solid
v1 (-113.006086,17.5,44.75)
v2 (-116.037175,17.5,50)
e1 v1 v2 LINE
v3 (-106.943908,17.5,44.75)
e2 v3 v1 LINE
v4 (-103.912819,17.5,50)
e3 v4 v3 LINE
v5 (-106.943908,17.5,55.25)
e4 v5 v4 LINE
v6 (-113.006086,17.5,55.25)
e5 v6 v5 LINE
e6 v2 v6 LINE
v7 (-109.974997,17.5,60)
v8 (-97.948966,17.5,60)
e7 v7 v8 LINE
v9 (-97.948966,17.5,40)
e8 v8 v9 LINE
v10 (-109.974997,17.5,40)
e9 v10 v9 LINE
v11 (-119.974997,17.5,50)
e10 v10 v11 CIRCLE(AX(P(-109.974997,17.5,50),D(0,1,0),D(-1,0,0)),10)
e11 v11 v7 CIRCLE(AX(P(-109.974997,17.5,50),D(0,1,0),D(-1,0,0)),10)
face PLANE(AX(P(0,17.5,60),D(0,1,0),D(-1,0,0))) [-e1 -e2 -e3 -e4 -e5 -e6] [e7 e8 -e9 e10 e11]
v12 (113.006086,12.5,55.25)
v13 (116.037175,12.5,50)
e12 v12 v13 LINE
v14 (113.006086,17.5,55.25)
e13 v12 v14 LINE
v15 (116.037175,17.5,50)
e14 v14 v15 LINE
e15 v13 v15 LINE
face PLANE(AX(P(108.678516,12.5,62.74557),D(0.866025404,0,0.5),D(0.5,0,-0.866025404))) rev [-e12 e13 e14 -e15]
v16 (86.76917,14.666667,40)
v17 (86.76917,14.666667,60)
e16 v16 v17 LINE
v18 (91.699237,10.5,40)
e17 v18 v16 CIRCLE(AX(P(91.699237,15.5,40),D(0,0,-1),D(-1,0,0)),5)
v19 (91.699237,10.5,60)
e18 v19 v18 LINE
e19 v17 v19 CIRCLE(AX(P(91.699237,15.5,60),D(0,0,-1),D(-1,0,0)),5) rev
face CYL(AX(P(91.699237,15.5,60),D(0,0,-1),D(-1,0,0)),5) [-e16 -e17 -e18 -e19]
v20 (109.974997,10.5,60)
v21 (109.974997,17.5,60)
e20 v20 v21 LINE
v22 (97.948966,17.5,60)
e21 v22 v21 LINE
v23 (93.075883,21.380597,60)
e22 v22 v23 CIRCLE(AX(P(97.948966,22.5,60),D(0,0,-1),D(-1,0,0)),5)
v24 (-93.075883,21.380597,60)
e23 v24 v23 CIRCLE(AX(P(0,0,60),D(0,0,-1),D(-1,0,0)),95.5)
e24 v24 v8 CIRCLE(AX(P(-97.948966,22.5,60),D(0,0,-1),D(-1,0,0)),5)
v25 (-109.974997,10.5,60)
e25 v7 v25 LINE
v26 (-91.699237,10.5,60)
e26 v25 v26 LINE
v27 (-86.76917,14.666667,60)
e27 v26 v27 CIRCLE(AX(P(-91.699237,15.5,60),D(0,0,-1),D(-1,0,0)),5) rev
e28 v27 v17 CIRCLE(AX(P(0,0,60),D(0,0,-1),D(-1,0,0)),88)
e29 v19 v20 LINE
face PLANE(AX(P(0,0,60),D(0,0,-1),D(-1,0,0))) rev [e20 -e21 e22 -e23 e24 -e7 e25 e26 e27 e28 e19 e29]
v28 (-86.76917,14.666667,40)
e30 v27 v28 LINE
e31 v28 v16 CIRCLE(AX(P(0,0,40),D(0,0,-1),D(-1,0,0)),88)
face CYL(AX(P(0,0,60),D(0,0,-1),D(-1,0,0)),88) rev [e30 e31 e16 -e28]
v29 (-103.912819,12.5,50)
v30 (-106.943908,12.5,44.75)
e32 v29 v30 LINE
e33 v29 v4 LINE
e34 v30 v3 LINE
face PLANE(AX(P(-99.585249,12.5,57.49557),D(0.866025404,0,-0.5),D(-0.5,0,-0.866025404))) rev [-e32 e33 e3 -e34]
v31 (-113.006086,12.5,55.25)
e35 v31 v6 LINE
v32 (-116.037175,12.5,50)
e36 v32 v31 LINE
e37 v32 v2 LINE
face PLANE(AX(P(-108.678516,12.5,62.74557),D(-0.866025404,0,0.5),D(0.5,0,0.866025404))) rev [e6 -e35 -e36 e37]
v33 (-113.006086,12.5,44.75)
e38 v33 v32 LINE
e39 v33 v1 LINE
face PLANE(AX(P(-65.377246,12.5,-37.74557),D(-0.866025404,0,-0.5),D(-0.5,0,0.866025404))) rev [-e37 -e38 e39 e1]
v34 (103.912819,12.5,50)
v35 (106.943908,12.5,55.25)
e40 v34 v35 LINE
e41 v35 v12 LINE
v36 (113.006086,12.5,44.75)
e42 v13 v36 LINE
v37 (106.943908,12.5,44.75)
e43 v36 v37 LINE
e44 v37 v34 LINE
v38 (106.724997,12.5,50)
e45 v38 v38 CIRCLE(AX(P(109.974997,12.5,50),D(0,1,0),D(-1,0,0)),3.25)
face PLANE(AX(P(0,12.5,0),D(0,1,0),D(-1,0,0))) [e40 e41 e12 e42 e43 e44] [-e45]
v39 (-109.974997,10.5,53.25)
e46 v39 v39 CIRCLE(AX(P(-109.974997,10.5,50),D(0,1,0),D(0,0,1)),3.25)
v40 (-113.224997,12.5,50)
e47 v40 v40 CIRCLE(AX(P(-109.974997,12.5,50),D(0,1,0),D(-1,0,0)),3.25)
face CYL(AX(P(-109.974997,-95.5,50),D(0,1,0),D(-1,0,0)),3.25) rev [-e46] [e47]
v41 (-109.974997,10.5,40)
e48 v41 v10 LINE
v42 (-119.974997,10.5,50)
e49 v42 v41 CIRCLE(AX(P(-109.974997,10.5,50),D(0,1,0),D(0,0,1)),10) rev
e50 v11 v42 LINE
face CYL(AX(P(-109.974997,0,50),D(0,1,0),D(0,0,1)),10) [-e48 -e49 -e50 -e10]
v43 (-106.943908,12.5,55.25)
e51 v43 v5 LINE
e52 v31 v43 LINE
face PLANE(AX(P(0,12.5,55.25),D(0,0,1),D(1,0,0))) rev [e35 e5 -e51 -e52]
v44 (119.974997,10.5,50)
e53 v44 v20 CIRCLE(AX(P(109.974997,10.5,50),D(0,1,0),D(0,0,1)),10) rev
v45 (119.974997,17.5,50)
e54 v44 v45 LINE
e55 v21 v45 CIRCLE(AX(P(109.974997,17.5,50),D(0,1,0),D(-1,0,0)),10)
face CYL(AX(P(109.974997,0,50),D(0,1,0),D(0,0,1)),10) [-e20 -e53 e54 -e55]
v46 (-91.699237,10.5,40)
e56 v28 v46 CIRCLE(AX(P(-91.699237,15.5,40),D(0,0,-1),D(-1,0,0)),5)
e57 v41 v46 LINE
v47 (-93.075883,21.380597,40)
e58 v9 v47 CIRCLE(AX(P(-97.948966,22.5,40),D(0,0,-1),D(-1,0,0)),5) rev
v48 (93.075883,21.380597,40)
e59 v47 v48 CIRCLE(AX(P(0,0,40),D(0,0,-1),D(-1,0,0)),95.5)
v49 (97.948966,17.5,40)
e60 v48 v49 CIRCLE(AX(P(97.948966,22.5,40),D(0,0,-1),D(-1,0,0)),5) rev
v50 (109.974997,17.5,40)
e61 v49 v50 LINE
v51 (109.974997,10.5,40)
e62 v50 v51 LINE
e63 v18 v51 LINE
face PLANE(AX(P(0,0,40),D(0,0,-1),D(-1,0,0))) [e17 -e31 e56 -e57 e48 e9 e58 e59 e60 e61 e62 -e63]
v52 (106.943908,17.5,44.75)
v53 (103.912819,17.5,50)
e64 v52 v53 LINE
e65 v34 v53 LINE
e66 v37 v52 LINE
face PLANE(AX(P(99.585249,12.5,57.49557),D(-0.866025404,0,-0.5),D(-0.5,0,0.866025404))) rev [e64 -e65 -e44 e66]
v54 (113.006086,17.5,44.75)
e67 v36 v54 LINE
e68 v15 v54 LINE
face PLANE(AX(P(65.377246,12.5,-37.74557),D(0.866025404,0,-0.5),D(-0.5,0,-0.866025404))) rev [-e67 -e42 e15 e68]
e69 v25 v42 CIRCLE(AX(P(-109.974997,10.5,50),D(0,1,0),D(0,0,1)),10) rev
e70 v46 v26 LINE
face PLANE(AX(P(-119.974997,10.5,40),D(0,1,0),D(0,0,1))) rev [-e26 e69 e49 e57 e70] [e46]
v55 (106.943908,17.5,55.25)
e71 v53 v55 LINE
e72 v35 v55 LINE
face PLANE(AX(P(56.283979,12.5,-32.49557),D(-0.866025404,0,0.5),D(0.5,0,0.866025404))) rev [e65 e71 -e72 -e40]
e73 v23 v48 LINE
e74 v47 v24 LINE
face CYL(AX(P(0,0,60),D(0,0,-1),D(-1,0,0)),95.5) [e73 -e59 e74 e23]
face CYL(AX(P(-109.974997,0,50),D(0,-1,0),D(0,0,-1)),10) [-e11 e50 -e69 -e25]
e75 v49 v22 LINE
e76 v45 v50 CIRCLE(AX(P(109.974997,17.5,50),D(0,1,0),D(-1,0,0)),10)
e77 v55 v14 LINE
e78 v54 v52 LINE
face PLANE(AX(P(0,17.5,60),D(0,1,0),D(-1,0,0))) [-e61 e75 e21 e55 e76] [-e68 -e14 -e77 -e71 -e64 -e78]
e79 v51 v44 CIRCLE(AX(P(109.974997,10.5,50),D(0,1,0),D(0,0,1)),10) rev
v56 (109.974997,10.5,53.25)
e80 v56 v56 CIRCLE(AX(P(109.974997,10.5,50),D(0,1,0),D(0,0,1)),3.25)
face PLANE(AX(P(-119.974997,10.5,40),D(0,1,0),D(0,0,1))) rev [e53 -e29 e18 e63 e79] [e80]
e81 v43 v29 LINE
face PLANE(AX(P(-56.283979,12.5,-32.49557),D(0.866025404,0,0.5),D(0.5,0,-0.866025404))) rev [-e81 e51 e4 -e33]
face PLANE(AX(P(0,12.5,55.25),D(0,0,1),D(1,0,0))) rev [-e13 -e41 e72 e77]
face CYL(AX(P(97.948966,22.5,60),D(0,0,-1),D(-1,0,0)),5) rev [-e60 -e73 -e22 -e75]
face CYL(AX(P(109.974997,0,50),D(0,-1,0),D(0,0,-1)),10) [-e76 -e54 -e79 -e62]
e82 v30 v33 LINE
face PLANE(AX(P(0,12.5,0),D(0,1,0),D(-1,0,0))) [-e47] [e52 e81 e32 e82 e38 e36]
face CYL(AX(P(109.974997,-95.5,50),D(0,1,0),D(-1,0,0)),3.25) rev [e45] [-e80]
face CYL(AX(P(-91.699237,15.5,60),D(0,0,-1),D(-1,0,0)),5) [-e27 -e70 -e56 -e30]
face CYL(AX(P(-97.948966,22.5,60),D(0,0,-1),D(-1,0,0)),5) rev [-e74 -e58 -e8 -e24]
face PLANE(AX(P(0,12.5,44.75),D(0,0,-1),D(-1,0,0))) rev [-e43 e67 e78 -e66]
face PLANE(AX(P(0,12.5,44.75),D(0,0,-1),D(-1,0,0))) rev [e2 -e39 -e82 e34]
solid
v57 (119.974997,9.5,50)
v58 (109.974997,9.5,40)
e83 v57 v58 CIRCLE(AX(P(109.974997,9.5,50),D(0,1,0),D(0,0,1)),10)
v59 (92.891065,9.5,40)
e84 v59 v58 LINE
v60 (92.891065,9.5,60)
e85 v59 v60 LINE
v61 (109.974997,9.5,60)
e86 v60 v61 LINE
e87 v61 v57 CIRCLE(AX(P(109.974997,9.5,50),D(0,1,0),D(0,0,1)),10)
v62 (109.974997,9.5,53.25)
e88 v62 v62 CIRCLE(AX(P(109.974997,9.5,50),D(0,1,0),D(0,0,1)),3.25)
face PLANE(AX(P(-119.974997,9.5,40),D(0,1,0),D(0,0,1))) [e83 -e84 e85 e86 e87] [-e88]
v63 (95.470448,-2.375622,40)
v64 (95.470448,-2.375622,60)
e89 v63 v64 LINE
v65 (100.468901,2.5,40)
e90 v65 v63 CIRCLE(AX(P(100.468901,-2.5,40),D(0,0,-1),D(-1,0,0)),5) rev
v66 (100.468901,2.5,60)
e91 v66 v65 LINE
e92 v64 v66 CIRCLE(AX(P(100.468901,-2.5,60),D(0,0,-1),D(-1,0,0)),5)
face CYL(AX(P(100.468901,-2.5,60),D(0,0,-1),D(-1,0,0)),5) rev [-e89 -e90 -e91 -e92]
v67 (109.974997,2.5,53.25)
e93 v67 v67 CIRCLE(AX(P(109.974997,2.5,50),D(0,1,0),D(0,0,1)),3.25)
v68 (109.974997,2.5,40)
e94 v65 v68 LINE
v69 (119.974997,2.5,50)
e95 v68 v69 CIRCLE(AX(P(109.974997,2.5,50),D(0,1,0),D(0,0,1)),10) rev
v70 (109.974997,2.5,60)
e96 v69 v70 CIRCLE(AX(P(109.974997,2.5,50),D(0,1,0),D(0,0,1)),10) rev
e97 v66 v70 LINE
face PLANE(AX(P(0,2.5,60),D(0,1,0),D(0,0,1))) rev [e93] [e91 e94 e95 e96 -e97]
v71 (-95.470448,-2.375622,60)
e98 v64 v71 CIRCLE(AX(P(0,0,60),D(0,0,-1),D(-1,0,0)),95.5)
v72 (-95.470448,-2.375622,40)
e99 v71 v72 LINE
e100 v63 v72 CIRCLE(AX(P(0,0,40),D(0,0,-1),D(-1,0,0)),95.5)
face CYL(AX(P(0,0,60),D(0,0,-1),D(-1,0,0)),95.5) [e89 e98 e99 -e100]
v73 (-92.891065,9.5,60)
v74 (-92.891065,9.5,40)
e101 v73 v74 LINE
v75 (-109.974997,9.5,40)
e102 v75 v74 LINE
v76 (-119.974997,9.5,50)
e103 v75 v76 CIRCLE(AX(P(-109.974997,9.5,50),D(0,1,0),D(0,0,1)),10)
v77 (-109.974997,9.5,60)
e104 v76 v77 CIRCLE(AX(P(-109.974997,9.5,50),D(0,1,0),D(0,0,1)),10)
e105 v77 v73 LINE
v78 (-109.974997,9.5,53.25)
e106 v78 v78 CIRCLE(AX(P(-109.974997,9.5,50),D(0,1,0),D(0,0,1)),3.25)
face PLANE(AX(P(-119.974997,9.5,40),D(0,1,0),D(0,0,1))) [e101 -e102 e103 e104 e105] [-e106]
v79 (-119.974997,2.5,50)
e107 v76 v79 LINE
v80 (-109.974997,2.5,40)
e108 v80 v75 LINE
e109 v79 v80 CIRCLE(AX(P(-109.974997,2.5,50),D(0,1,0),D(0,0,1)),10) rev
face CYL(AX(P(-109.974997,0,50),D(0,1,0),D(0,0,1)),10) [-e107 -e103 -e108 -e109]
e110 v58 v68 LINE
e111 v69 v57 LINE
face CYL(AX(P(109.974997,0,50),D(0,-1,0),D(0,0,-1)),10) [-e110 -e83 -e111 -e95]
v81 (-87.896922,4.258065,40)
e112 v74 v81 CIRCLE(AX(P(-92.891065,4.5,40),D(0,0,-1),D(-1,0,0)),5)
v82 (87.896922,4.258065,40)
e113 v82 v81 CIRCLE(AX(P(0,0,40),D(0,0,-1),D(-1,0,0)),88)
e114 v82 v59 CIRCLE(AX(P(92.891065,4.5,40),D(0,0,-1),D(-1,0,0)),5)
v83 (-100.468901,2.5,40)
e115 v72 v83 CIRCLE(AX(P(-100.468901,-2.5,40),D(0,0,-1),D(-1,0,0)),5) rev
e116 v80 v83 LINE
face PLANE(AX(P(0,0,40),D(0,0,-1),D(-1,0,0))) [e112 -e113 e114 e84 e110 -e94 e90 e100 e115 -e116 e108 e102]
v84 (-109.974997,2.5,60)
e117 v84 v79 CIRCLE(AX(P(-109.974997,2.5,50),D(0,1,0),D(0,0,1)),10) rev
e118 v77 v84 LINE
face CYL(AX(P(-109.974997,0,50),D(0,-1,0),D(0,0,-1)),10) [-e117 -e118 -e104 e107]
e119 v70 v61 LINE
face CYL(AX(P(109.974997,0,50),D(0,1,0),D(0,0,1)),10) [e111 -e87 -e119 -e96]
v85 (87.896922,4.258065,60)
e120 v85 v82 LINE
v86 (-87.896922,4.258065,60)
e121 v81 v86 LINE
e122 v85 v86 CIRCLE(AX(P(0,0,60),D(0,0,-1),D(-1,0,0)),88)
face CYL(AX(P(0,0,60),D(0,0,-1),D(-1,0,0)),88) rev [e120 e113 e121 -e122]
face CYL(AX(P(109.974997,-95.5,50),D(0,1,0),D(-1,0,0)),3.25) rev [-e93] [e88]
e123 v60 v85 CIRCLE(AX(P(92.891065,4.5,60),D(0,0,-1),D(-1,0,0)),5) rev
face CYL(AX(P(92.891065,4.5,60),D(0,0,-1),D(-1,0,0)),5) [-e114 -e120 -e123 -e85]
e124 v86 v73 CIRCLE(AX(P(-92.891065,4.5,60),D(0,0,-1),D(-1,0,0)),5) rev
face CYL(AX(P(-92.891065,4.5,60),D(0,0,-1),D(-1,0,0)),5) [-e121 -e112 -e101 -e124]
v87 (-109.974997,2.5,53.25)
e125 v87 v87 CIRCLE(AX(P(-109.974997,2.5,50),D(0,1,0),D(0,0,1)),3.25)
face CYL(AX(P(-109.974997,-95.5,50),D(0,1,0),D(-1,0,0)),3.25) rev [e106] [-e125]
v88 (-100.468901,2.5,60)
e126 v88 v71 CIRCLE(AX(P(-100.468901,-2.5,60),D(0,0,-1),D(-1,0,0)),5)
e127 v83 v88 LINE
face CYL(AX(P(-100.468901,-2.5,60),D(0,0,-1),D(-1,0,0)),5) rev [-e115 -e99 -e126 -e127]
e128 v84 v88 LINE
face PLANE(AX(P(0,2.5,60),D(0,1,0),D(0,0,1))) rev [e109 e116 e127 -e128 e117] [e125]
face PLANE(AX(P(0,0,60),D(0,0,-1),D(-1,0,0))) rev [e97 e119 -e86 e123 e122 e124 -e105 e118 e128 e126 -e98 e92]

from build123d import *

# Parameters (mm, degrees)
BOSS_EXTRUDE1_DEPTH     = 20
CUT_EXTRUDE1_DEPTH      = 266.13439864
CUT_EXTRUDE1_DEPTH_BACK = 266.13439864
SKETCH3_W               = 20
SKETCH3_H               = 1
FILLET1_R               = 5
FILLET2_R               = 5
FILLET3_R               = 10
FILLET4_R               = 10
CUT_EXTRUDE2_DEPTH      = 5
SKETCH5_R               = 3.25
CUT_EXTRUDE3_DEPTH      = 173.214981616


with BuildPart() as part:
    # Sketch2 → Boss-Extrude1 (new body)
    with BuildSketch(Plane(origin=(0, 0, 40), x_dir=(-1, 0, 0), z_dir=(0, 0, -1))):
        with BuildLine():
            Line((94.97499671, 10), (119.97499671, 10))
            Line((119.97499671, 10), (119.97499671, 17.5))
            Line((119.97499671, 17.5), (93.882905792, 17.5))
            ThreePointArc((93.882905792, 17.5), (94.503382661, 13.760838116), (94.97499671, 10))
        make_face()
        with BuildLine():
            Line((87.429971978, 10), (94.97499671, 10))
            ThreePointArc((94.97499671, 10), (94.503382661, 13.760838116), (93.882905792, 17.5))
            Line((93.882905792, 17.5), (86.242390969, 17.5))
            ThreePointArc((86.242390969, 17.5), (86.917115189, 13.762815379), (87.429971978, 10))
        make_face()
        with BuildLine():
            Line((86.242390969, 17.5), (93.882905792, 17.5))
            ThreePointArc((93.882905792, 17.5), (0, 95.5), (-93.882905792, 17.5))
            Line((-93.882905792, 17.5), (-86.242390969, 17.5))
            ThreePointArc((-86.242390969, 17.5), (0, 88), (86.242390969, 17.5))
        make_face()
        with BuildLine():
            Line((87.964481468, 2.5), (95.467271879, 2.5))
            ThreePointArc((95.467271879, 2.5), (95.294946961, 6.254844819), (94.97499671, 10))
            Line((94.97499671, 10), (87.429971978, 10))
            ThreePointArc((87.429971978, 10), (87.77736653, 6.255711398), (87.964481468, 2.5))
        make_face()
        with BuildLine():
            Line((95.467271879, 2.5), (119.97499671, 2.5))
            Line((119.97499671, 2.5), (119.97499671, 10))
            Line((119.97499671, 10), (94.97499671, 10))
            ThreePointArc((94.97499671, 10), (95.294946961, 6.254844819), (95.467271879, 2.5))
        make_face()
        with BuildLine():
            ThreePointArc((95.5, 0), (95.491817619, 1.250107108), (95.467271879, 2.5))
            Line((95.467271879, 2.5), (87.964481468, 2.5))
            ThreePointArc((87.964481468, 2.5), (87.991119919, 1.25012615), (88, 0))
            ThreePointArc((88, 0), (-1.25012615, -87.991119919), (-87.964481468, 2.5))
            Line((-87.964481468, 2.5), (-95.467271879, 2.5))
            ThreePointArc((-95.467271879, 2.5), (-1.250107108, -95.491817619), (95.5, 0))
        make_face()
        with BuildLine():
            Line((-95.467271879, 2.5), (-87.964481468, 2.5))
            ThreePointArc((-87.964481468, 2.5), (-87.77736653, 6.255711398), (-87.429971978, 10))
            Line((-87.429971978, 10), (-94.97499671, 10))
            ThreePointArc((-94.97499671, 10), (-95.294946961, 6.254844819), (-95.467271879, 2.5))
        make_face()
        with BuildLine():
            Line((-94.97499671, 10), (-87.429971978, 10))
            ThreePointArc((-87.429971978, 10), (-86.917115189, 13.762815379), (-86.242390969, 17.5))
            Line((-86.242390969, 17.5), (-93.882905792, 17.5))
            ThreePointArc((-93.882905792, 17.5), (-94.503382661, 13.760838116), (-94.97499671, 10))
        make_face()
        with BuildLine():
            Line((-119.97499671, 10), (-94.97499671, 10))
            ThreePointArc((-94.97499671, 10), (-94.503382661, 13.760838116), (-93.882905792, 17.5))
            Line((-93.882905792, 17.5), (-119.97499671, 17.5))
            Line((-119.97499671, 17.5), (-119.97499671, 10))
        make_face()
        with BuildLine():
            Line((-119.97499671, 2.5), (-95.467271879, 2.5))
            ThreePointArc((-95.467271879, 2.5), (-95.294946961, 6.254844819), (-94.97499671, 10))
            Line((-94.97499671, 10), (-119.97499671, 10))
            Line((-119.97499671, 10), (-119.97499671, 2.5))
        make_face()
    extrude(amount=-BOSS_EXTRUDE1_DEPTH)

    # Sketch3 → Cut-Extrude1 (cut, two sides: drawn at the far end of the back side and taken through both)
    with BuildSketch(Plane(origin=(119.97499671, 0, 0), x_dir=(0, 0, -1), z_dir=(1, 0, 0)).offset(-CUT_EXTRUDE1_DEPTH_BACK)):
        with Locations((-50, 10)):
            Rectangle(SKETCH3_W, SKETCH3_H)
    extrude(amount=CUT_EXTRUDE1_DEPTH + CUT_EXTRUDE1_DEPTH_BACK, mode=Mode.SUBTRACT)


with BuildPart() as cut_extrude1_piece_1:
    # of the separate pieces the step leaves, piece 1, a body of its own (cut_extrude1_pieces)
    add(part.part.solids().sort_by_distance((-119.97499671, 2.5, 40))[0])

    # Fillet2
    fillet2_edges = [cut_extrude1_piece_1.edges().sort_by_distance(p)[0] for p in [
        (-95.467271879, 2.5, 50),
        (95.467271879, 2.5, 50),
        (87.485713119, 9.5, 50),
        (-87.485713119, 9.5, 50),
    ]]
    fillet(fillet2_edges, radius=FILLET2_R)

    # Fillet3
    fillet3_edges = [cut_extrude1_piece_1.edges().sort_by_distance(p)[0] for p in [
        (119.97499671, 6, 60),
        (-119.97499671, 6, 40),
        (-119.97499671, 6, 60),
        (119.97499671, 6, 40),
    ]]
    fillet(fillet3_edges, radius=FILLET3_R - 0.0001)  # a hair under: the kernel refuses the full size


with BuildPart() as cut_extrude1_piece_2:
    # of the separate pieces the step leaves, piece 2, a body of its own (cut_extrude1_pieces)
    add(part.part.solids().sort_by_distance((-119.97499671, 10.5, 40))[0])

    # Fillet1
    fillet1_edges = [cut_extrude1_piece_2.edges().sort_by_distance(p)[0] for p in [
        (93.882905792, 17.5, 50),
        (-93.882905792, 17.5, 50),
        (87.371333972, 10.5, 50),
        (-87.371333972, 10.5, 50),
    ]]
    fillet(fillet1_edges, radius=FILLET1_R)

    # Fillet4
    fillet4_edges = [cut_extrude1_piece_2.edges().sort_by_distance(p)[0] for p in [
        (-119.97499671, 14, 60),
        (-119.97499671, 14, 40),
        (119.97499671, 14, 60),
        (119.97499671, 14, 40),
    ]]
    fillet(fillet4_edges, radius=FILLET4_R - 0.0001)  # a hair under: the kernel refuses the full size

    # Sketch4 → Cut-Extrude2 (cut)
    with BuildSketch(Plane(origin=(0, 17.5, 0), x_dir=(1, 0, 0), z_dir=(0, 1, 0))):
        Polygon((106.943907796, -55.25), (113.006085623, -55.25), (116.037174536, -50), (113.006085623, -44.75), (106.943907796, -44.75), (103.912818883, -50), align=None)
        Polygon((-103.912818883, -50), (-106.943907796, -44.75), (-113.006085623, -44.75), (-116.037174536, -50), (-113.006085623, -55.25), (-106.943907796, -55.25), align=None)
    extrude(amount=-CUT_EXTRUDE2_DEPTH, mode=Mode.SUBTRACT)


with BuildPart() as cut_extrude3_tool:
    # Sketch5 → Cut-Extrude3 (new, through all)
    with BuildSketch(Plane(origin=(0, 12.5, 0), x_dir=(1, 0, 0), z_dir=(0, 1, 0))):
        with Locations(Location((-109.97499671, -50, 0), (0, 0, 270))):
            Circle(SKETCH5_R)
        with Locations(Location((109.97499671, -50, 0), (0, 0, 270))):
            Circle(SKETCH5_R)
    extrude(amount=-CUT_EXTRUDE3_DEPTH)


with BuildPart() as cut_extrude1_piece_1_1:
    add(cut_extrude1_piece_1.part)

    # Cut-Extrude3: cut by cut_extrude3_tool
    add(cut_extrude3_tool.part, mode=Mode.SUBTRACT)


with BuildPart() as cut_extrude1_piece_2_1:
    add(cut_extrude1_piece_2.part)

    # Cut-Extrude3: cut by cut_extrude3_tool
    add(cut_extrude3_tool.part, mode=Mode.SUBTRACT)


solid = Compound([cut_extrude1_piece_1_1.part, cut_extrude1_piece_2_1.part])
